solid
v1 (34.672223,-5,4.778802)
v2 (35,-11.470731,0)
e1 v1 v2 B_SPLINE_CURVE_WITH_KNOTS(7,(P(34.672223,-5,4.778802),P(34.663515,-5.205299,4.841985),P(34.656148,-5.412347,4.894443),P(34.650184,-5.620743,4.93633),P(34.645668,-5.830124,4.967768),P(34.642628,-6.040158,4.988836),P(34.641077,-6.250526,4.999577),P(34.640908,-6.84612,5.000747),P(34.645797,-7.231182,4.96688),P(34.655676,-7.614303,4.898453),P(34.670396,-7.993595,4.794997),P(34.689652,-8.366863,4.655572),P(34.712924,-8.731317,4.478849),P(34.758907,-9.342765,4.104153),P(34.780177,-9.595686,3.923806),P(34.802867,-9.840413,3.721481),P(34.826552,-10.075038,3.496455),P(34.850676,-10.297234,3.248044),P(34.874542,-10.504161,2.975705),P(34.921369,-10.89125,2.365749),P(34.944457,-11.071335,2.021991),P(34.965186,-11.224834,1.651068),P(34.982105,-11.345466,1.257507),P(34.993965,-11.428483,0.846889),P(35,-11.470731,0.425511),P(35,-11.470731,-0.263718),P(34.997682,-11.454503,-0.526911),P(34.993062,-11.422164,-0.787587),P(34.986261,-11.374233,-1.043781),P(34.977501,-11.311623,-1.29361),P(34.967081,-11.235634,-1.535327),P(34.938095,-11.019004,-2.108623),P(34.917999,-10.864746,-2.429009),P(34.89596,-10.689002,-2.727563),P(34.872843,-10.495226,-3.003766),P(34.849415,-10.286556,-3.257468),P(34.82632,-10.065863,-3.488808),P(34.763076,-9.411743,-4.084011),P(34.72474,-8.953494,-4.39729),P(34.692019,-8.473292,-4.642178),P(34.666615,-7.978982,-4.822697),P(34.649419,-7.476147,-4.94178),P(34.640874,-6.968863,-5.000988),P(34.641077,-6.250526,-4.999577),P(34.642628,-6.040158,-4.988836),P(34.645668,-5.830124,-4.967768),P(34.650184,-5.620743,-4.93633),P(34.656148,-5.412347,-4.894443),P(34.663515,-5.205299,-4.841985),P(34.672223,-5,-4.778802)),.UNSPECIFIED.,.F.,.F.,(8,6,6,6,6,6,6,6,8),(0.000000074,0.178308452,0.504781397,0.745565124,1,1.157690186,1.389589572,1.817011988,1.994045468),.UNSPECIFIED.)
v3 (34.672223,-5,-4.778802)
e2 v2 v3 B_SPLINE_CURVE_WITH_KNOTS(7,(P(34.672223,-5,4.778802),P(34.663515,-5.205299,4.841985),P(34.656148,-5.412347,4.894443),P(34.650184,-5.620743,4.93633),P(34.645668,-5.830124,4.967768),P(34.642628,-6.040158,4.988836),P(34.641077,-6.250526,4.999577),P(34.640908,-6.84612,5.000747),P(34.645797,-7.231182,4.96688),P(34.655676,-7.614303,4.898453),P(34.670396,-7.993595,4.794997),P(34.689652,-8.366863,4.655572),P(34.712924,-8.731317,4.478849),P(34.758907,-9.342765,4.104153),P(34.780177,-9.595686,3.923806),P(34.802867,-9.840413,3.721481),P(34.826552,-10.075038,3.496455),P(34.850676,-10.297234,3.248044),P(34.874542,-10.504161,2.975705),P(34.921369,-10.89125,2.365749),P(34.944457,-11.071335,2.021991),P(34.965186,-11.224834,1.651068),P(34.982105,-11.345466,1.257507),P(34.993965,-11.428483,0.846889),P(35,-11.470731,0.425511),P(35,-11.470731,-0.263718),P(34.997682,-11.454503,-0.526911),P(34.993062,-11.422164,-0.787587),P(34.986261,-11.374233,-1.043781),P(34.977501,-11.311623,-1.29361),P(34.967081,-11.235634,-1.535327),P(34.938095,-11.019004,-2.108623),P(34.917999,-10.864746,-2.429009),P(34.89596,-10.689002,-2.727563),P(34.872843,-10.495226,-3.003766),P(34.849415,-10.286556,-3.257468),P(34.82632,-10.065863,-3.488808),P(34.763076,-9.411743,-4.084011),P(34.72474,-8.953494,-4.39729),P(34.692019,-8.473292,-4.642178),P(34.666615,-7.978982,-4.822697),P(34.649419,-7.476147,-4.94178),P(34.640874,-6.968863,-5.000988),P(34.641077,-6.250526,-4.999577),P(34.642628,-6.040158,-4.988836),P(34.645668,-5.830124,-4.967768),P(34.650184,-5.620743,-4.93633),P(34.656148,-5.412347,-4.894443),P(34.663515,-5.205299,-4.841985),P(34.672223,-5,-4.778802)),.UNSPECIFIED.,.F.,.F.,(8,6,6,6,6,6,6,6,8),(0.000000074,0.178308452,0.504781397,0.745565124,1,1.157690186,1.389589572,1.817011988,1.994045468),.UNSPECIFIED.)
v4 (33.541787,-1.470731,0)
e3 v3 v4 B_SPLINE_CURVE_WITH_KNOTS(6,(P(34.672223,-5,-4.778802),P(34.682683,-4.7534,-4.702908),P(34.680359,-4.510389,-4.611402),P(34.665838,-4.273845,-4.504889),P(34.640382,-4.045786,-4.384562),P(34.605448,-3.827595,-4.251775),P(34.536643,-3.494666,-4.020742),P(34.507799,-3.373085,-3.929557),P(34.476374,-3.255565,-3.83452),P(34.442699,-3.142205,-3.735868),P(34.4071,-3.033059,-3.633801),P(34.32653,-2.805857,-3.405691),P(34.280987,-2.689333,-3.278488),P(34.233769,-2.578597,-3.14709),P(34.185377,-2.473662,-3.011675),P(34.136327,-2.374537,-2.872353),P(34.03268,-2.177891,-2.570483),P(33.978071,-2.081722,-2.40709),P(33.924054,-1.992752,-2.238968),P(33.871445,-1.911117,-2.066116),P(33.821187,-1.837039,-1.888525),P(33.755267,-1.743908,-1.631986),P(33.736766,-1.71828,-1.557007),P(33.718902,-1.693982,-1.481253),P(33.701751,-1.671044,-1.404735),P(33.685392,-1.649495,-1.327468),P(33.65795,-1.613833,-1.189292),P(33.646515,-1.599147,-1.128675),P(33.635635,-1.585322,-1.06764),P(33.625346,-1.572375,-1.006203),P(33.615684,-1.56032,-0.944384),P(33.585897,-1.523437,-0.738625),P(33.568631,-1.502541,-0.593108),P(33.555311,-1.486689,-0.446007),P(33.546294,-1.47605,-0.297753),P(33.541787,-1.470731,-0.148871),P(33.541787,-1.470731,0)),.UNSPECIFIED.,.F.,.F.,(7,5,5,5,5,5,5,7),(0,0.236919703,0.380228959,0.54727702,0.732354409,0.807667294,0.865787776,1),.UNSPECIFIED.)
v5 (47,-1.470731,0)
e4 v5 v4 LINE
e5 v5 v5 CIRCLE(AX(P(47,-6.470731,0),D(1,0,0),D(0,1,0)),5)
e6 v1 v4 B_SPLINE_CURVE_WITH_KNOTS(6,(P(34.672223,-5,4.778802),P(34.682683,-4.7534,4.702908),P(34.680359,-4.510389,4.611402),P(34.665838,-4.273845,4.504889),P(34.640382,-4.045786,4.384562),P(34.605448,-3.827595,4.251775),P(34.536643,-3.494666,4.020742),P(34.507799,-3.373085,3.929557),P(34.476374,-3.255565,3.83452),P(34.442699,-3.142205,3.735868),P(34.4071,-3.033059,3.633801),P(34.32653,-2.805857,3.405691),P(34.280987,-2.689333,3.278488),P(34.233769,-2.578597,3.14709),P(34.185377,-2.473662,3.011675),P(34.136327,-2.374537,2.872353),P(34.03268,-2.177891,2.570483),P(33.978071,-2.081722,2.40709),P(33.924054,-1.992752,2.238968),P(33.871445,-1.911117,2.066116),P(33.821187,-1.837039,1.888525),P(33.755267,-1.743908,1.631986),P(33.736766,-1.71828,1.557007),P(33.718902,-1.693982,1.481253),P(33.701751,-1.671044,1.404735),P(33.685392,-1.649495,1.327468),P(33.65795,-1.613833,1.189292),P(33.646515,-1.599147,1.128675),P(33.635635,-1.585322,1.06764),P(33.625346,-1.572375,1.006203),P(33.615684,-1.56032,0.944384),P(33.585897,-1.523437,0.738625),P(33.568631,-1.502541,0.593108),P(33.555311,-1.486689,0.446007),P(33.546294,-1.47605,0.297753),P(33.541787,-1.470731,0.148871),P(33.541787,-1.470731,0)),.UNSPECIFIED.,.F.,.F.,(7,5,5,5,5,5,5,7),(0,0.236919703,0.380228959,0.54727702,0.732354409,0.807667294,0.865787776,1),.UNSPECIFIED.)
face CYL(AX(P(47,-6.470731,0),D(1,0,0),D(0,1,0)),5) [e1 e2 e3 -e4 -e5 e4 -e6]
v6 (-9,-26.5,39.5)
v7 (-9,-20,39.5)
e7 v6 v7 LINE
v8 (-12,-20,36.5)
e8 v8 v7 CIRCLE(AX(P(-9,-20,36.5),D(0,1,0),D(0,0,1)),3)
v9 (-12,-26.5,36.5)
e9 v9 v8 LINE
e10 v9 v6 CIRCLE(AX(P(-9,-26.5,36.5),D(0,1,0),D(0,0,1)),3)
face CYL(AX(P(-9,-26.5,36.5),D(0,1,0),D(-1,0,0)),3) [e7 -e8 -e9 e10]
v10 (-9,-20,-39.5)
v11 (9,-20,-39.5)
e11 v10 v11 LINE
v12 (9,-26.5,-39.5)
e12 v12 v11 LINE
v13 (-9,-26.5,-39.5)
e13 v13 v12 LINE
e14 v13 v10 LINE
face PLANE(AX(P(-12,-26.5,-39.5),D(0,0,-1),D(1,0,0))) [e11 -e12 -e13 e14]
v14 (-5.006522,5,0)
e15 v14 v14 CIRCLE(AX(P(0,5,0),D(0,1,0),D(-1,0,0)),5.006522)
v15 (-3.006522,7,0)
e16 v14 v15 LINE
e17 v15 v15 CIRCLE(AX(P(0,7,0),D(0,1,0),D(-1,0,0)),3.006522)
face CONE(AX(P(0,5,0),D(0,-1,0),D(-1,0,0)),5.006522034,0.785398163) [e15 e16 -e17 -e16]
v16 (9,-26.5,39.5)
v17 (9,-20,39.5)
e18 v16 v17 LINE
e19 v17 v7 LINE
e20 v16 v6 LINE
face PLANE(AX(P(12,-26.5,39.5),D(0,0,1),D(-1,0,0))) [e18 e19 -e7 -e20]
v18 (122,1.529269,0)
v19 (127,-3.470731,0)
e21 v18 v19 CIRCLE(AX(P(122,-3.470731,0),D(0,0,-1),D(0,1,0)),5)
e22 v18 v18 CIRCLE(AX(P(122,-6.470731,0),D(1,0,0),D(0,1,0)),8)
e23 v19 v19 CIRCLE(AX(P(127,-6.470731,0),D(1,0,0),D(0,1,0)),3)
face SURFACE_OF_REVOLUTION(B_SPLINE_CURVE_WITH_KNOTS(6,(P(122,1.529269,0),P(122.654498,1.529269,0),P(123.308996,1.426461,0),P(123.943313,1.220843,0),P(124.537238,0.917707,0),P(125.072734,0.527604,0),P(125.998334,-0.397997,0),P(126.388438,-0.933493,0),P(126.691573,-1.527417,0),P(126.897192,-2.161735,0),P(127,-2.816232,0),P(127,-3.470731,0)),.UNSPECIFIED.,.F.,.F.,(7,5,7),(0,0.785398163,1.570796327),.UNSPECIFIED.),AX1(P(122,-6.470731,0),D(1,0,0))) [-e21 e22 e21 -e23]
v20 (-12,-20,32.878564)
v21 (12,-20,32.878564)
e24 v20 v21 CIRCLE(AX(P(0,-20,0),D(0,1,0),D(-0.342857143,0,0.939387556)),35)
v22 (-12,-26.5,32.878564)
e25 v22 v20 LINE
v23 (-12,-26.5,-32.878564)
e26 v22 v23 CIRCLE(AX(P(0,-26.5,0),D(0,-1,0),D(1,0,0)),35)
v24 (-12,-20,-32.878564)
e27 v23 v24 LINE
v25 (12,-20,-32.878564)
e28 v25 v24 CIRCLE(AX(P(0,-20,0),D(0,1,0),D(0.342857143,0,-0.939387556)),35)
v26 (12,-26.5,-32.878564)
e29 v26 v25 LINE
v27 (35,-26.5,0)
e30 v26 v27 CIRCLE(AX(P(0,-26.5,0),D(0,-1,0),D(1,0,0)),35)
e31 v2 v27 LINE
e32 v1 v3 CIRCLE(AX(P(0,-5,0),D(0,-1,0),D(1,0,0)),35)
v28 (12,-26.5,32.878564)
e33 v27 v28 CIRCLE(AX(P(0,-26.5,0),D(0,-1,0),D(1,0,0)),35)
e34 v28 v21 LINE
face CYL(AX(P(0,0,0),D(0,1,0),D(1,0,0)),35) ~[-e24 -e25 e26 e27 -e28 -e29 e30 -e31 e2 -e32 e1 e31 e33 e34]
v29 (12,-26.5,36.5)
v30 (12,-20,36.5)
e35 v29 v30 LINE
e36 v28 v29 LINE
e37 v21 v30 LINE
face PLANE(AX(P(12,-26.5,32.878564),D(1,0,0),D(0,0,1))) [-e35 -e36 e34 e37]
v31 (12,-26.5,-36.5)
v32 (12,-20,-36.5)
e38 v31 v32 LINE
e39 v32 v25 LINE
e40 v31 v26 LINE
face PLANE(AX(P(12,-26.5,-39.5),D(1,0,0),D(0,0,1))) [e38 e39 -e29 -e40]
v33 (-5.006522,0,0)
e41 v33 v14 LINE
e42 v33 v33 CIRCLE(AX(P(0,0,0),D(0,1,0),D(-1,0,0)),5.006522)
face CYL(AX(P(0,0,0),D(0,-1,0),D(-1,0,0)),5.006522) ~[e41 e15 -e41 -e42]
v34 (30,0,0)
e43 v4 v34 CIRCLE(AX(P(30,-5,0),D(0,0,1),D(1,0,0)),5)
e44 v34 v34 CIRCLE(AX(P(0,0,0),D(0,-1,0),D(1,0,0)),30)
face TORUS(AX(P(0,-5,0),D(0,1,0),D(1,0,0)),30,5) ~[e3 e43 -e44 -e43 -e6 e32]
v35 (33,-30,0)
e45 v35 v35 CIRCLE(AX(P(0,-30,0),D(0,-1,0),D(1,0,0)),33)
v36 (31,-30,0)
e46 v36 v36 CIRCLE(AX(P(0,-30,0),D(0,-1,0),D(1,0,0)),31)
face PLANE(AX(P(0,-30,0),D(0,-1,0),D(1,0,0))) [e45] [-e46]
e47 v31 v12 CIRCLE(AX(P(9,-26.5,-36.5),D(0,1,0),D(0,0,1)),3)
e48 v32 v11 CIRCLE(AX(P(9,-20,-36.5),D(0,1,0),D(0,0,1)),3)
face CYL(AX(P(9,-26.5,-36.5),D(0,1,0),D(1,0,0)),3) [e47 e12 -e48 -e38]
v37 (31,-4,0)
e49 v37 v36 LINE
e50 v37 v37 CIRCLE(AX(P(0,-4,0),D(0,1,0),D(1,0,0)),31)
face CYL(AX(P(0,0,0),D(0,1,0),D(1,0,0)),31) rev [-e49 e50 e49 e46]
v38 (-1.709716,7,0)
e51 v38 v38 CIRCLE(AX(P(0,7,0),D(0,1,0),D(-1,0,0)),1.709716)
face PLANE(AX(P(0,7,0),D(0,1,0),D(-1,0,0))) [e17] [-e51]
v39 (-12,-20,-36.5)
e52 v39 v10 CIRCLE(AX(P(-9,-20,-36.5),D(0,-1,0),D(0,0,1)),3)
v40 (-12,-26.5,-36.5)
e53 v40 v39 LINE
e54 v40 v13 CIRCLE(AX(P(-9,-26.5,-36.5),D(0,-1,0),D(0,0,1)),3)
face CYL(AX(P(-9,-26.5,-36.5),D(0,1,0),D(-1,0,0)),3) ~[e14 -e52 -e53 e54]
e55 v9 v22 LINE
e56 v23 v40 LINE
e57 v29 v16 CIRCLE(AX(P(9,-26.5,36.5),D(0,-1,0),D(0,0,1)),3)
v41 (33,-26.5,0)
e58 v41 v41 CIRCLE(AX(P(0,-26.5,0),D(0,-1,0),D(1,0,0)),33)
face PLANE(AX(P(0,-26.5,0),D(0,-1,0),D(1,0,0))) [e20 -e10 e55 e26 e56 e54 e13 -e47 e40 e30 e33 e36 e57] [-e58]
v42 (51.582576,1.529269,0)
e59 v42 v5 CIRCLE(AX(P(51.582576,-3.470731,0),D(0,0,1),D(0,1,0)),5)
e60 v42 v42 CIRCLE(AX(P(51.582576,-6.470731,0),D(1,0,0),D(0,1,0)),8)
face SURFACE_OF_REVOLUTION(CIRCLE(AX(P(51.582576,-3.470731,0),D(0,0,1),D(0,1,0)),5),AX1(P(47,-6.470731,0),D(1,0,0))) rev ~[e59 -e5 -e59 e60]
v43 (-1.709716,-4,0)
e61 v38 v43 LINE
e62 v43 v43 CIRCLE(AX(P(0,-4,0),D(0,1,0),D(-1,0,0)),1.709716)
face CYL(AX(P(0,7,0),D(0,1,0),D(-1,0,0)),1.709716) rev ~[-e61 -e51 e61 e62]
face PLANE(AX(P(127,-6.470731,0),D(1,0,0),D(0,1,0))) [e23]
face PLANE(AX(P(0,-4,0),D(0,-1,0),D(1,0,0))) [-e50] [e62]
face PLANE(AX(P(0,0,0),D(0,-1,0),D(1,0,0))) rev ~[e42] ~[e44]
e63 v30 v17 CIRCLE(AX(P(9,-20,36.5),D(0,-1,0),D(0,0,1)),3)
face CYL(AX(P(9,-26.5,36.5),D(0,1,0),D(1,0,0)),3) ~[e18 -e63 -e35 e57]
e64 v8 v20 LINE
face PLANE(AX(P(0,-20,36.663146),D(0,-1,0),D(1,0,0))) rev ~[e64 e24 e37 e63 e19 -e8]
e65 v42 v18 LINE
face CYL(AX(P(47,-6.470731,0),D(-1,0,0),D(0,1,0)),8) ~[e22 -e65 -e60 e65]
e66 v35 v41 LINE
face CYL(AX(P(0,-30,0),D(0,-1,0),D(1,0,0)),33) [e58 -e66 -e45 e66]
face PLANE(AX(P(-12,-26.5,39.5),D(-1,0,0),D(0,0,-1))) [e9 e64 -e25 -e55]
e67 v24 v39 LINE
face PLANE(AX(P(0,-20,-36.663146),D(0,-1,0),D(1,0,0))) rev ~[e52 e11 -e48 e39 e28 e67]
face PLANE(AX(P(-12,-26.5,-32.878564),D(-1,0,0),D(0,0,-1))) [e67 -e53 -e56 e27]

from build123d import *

# Parameters (mm, degrees)
F0_R      = 35
F1_DEPTH  = 30
F2_T      = -4
F3_R      = 5
F5_R      = 5
F7_R      = 8
F7_R_2    = 5
F8_DEPTH  = 80
F9_R      = 5.0065220345
F10_DEPTH = 7
F11_SIZE  = 2
F14_DEPTH = 6.5
F15_R     = 5
F17_R     = 35
F17_R_2   = 33
F18_DEPTH = 3.5
F19_R     = 3
F20_R     = 1.7097163671
F21_DEPTH = 37.001


# Not quite as in the source:
# - a fillet or chamfer that OpenCascade refuses, or shapes differently, is made with other operations: its cross-section is extruded or revolved along the edge and cut away or added


with BuildPart() as f1:
    # F0 (on Front) → F1 (new body)
    with BuildSketch(Plane.XZ):
        Circle(F0_R)
    extrude(amount=F1_DEPTH)

    # F2
    f2_openings = [f1.faces().sort_by_distance(p)[0] for p in [
        (0, -30, 0),
    ]]
    offset(amount=F2_T, openings=f2_openings)

    # F3
    f3_edges = [f1.edges().sort_by_distance(p)[0] for p in [
        (-35, 0, 0),
    ]]
    fillet(f3_edges, radius=F3_R)

    # F5 (on offset) → F6 (join, up to the next surface of F1)
    with BuildSketch(Plane.YZ.offset(47)):
        with Locations((-6.4707305679, 0)):
            Circle(F5_R)
    extrude(until=Until.NEXT, dir=(-1, 0, 0))

    # F7 (on face) → F8 (join)
    with BuildSketch(Plane.YZ.offset(47)):
        with Locations((-6.4707305679, 0)):
            Circle(F7_R)
        with Locations((-6.4707305679, 0)):
            Circle(F7_R_2, mode=Mode.SUBTRACT)
        with Locations((-6.4707305679, 0)):
            Circle(F7_R_2)
    extrude(amount=F8_DEPTH)

    # F9 (on face) → F10 (join)
    with BuildSketch(Plane(origin=(0, 0, 0), x_dir=(-1, 0, 0), z_dir=(0, 1, 0))):
        Circle(F9_R)
    extrude(amount=F10_DEPTH)

    # F11
    f11_edges = [f1.edges().sort_by_distance(p)[0] for p in [
        (5.006522, 7, 0),
    ]]
    chamfer(f11_edges, length=F11_SIZE)

    # F13 (on offset) → F14 (join)
    with BuildSketch(Plane.XZ.offset(26.5)):
        with BuildLine():
            Line((-12, -39.5), (12, -39.5))
            Line((12, -39.5), (12, -32.8785644455))
            ThreePointArc((12, -32.8785644455), (0, -35), (-12, -32.8785644455))
            Line((-12, -32.8785644455), (-12, -39.5))
        make_face()
        with BuildLine():
            ThreePointArc((-12, 32.8785644455), (0, 35), (12, 32.8785644455))
            Line((12, 32.8785644455), (12, 39.5))
            Line((12, 39.5), (-12, 39.5))
            Line((-12, 39.5), (-12, 32.8785644455))
        make_face()
    extrude(amount=-F14_DEPTH)

    # F15
    f15_edges = [f1.edges().sort_by_distance(p)[0] for p in [
        (127, -14.470731, 0),
    ]]
    fillet(f15_edges, radius=F15_R)

    # F16: fillet of radius 5 on 1 edges, made by hand

    # F16_s1 → F16_t2 (revolve, cut)
    with BuildSketch(Plane.XY):
        with BuildLine():
            ThreePointArc((51.582575695, 1.5292694321), (48.8439629074, 0.7125695648), (47, -1.4707305679))
            Line((47, -1.4707305679), (47, 1.5292694321))
            Line((47, 1.5292694321), (51.582575695, 1.5292694321))
        make_face()
    revolve(axis=Axis((47, -6.4707305679, 0), (1, 0, 0)), mode=Mode.SUBTRACT)

    # F17 (on face) → F18 (cut, through all)
    with BuildSketch(Plane.XZ.offset(30)):
        Circle(F17_R)
        Circle(F17_R_2, mode=Mode.SUBTRACT)
    extrude(amount=-F18_DEPTH, mode=Mode.SUBTRACT)

    # F19
    f19_edges = [f1.edges().sort_by_distance(p)[0] for p in [
        (12, -23.25, 39.5),
        (-12, -23.25, 39.5),
        (-12, -23.25, -39.5),
        (12, -23.25, -39.5),
    ]]
    fillet(f19_edges, radius=F19_R)

    # F20 (on face) → F21 (cut, through all)
    with BuildSketch(Plane(origin=(0, 7, 0), x_dir=(-1, 0, 0), z_dir=(0, 1, 0))):
        Circle(F20_R)
    extrude(amount=-F21_DEPTH, mode=Mode.SUBTRACT)


solid = f1.part
